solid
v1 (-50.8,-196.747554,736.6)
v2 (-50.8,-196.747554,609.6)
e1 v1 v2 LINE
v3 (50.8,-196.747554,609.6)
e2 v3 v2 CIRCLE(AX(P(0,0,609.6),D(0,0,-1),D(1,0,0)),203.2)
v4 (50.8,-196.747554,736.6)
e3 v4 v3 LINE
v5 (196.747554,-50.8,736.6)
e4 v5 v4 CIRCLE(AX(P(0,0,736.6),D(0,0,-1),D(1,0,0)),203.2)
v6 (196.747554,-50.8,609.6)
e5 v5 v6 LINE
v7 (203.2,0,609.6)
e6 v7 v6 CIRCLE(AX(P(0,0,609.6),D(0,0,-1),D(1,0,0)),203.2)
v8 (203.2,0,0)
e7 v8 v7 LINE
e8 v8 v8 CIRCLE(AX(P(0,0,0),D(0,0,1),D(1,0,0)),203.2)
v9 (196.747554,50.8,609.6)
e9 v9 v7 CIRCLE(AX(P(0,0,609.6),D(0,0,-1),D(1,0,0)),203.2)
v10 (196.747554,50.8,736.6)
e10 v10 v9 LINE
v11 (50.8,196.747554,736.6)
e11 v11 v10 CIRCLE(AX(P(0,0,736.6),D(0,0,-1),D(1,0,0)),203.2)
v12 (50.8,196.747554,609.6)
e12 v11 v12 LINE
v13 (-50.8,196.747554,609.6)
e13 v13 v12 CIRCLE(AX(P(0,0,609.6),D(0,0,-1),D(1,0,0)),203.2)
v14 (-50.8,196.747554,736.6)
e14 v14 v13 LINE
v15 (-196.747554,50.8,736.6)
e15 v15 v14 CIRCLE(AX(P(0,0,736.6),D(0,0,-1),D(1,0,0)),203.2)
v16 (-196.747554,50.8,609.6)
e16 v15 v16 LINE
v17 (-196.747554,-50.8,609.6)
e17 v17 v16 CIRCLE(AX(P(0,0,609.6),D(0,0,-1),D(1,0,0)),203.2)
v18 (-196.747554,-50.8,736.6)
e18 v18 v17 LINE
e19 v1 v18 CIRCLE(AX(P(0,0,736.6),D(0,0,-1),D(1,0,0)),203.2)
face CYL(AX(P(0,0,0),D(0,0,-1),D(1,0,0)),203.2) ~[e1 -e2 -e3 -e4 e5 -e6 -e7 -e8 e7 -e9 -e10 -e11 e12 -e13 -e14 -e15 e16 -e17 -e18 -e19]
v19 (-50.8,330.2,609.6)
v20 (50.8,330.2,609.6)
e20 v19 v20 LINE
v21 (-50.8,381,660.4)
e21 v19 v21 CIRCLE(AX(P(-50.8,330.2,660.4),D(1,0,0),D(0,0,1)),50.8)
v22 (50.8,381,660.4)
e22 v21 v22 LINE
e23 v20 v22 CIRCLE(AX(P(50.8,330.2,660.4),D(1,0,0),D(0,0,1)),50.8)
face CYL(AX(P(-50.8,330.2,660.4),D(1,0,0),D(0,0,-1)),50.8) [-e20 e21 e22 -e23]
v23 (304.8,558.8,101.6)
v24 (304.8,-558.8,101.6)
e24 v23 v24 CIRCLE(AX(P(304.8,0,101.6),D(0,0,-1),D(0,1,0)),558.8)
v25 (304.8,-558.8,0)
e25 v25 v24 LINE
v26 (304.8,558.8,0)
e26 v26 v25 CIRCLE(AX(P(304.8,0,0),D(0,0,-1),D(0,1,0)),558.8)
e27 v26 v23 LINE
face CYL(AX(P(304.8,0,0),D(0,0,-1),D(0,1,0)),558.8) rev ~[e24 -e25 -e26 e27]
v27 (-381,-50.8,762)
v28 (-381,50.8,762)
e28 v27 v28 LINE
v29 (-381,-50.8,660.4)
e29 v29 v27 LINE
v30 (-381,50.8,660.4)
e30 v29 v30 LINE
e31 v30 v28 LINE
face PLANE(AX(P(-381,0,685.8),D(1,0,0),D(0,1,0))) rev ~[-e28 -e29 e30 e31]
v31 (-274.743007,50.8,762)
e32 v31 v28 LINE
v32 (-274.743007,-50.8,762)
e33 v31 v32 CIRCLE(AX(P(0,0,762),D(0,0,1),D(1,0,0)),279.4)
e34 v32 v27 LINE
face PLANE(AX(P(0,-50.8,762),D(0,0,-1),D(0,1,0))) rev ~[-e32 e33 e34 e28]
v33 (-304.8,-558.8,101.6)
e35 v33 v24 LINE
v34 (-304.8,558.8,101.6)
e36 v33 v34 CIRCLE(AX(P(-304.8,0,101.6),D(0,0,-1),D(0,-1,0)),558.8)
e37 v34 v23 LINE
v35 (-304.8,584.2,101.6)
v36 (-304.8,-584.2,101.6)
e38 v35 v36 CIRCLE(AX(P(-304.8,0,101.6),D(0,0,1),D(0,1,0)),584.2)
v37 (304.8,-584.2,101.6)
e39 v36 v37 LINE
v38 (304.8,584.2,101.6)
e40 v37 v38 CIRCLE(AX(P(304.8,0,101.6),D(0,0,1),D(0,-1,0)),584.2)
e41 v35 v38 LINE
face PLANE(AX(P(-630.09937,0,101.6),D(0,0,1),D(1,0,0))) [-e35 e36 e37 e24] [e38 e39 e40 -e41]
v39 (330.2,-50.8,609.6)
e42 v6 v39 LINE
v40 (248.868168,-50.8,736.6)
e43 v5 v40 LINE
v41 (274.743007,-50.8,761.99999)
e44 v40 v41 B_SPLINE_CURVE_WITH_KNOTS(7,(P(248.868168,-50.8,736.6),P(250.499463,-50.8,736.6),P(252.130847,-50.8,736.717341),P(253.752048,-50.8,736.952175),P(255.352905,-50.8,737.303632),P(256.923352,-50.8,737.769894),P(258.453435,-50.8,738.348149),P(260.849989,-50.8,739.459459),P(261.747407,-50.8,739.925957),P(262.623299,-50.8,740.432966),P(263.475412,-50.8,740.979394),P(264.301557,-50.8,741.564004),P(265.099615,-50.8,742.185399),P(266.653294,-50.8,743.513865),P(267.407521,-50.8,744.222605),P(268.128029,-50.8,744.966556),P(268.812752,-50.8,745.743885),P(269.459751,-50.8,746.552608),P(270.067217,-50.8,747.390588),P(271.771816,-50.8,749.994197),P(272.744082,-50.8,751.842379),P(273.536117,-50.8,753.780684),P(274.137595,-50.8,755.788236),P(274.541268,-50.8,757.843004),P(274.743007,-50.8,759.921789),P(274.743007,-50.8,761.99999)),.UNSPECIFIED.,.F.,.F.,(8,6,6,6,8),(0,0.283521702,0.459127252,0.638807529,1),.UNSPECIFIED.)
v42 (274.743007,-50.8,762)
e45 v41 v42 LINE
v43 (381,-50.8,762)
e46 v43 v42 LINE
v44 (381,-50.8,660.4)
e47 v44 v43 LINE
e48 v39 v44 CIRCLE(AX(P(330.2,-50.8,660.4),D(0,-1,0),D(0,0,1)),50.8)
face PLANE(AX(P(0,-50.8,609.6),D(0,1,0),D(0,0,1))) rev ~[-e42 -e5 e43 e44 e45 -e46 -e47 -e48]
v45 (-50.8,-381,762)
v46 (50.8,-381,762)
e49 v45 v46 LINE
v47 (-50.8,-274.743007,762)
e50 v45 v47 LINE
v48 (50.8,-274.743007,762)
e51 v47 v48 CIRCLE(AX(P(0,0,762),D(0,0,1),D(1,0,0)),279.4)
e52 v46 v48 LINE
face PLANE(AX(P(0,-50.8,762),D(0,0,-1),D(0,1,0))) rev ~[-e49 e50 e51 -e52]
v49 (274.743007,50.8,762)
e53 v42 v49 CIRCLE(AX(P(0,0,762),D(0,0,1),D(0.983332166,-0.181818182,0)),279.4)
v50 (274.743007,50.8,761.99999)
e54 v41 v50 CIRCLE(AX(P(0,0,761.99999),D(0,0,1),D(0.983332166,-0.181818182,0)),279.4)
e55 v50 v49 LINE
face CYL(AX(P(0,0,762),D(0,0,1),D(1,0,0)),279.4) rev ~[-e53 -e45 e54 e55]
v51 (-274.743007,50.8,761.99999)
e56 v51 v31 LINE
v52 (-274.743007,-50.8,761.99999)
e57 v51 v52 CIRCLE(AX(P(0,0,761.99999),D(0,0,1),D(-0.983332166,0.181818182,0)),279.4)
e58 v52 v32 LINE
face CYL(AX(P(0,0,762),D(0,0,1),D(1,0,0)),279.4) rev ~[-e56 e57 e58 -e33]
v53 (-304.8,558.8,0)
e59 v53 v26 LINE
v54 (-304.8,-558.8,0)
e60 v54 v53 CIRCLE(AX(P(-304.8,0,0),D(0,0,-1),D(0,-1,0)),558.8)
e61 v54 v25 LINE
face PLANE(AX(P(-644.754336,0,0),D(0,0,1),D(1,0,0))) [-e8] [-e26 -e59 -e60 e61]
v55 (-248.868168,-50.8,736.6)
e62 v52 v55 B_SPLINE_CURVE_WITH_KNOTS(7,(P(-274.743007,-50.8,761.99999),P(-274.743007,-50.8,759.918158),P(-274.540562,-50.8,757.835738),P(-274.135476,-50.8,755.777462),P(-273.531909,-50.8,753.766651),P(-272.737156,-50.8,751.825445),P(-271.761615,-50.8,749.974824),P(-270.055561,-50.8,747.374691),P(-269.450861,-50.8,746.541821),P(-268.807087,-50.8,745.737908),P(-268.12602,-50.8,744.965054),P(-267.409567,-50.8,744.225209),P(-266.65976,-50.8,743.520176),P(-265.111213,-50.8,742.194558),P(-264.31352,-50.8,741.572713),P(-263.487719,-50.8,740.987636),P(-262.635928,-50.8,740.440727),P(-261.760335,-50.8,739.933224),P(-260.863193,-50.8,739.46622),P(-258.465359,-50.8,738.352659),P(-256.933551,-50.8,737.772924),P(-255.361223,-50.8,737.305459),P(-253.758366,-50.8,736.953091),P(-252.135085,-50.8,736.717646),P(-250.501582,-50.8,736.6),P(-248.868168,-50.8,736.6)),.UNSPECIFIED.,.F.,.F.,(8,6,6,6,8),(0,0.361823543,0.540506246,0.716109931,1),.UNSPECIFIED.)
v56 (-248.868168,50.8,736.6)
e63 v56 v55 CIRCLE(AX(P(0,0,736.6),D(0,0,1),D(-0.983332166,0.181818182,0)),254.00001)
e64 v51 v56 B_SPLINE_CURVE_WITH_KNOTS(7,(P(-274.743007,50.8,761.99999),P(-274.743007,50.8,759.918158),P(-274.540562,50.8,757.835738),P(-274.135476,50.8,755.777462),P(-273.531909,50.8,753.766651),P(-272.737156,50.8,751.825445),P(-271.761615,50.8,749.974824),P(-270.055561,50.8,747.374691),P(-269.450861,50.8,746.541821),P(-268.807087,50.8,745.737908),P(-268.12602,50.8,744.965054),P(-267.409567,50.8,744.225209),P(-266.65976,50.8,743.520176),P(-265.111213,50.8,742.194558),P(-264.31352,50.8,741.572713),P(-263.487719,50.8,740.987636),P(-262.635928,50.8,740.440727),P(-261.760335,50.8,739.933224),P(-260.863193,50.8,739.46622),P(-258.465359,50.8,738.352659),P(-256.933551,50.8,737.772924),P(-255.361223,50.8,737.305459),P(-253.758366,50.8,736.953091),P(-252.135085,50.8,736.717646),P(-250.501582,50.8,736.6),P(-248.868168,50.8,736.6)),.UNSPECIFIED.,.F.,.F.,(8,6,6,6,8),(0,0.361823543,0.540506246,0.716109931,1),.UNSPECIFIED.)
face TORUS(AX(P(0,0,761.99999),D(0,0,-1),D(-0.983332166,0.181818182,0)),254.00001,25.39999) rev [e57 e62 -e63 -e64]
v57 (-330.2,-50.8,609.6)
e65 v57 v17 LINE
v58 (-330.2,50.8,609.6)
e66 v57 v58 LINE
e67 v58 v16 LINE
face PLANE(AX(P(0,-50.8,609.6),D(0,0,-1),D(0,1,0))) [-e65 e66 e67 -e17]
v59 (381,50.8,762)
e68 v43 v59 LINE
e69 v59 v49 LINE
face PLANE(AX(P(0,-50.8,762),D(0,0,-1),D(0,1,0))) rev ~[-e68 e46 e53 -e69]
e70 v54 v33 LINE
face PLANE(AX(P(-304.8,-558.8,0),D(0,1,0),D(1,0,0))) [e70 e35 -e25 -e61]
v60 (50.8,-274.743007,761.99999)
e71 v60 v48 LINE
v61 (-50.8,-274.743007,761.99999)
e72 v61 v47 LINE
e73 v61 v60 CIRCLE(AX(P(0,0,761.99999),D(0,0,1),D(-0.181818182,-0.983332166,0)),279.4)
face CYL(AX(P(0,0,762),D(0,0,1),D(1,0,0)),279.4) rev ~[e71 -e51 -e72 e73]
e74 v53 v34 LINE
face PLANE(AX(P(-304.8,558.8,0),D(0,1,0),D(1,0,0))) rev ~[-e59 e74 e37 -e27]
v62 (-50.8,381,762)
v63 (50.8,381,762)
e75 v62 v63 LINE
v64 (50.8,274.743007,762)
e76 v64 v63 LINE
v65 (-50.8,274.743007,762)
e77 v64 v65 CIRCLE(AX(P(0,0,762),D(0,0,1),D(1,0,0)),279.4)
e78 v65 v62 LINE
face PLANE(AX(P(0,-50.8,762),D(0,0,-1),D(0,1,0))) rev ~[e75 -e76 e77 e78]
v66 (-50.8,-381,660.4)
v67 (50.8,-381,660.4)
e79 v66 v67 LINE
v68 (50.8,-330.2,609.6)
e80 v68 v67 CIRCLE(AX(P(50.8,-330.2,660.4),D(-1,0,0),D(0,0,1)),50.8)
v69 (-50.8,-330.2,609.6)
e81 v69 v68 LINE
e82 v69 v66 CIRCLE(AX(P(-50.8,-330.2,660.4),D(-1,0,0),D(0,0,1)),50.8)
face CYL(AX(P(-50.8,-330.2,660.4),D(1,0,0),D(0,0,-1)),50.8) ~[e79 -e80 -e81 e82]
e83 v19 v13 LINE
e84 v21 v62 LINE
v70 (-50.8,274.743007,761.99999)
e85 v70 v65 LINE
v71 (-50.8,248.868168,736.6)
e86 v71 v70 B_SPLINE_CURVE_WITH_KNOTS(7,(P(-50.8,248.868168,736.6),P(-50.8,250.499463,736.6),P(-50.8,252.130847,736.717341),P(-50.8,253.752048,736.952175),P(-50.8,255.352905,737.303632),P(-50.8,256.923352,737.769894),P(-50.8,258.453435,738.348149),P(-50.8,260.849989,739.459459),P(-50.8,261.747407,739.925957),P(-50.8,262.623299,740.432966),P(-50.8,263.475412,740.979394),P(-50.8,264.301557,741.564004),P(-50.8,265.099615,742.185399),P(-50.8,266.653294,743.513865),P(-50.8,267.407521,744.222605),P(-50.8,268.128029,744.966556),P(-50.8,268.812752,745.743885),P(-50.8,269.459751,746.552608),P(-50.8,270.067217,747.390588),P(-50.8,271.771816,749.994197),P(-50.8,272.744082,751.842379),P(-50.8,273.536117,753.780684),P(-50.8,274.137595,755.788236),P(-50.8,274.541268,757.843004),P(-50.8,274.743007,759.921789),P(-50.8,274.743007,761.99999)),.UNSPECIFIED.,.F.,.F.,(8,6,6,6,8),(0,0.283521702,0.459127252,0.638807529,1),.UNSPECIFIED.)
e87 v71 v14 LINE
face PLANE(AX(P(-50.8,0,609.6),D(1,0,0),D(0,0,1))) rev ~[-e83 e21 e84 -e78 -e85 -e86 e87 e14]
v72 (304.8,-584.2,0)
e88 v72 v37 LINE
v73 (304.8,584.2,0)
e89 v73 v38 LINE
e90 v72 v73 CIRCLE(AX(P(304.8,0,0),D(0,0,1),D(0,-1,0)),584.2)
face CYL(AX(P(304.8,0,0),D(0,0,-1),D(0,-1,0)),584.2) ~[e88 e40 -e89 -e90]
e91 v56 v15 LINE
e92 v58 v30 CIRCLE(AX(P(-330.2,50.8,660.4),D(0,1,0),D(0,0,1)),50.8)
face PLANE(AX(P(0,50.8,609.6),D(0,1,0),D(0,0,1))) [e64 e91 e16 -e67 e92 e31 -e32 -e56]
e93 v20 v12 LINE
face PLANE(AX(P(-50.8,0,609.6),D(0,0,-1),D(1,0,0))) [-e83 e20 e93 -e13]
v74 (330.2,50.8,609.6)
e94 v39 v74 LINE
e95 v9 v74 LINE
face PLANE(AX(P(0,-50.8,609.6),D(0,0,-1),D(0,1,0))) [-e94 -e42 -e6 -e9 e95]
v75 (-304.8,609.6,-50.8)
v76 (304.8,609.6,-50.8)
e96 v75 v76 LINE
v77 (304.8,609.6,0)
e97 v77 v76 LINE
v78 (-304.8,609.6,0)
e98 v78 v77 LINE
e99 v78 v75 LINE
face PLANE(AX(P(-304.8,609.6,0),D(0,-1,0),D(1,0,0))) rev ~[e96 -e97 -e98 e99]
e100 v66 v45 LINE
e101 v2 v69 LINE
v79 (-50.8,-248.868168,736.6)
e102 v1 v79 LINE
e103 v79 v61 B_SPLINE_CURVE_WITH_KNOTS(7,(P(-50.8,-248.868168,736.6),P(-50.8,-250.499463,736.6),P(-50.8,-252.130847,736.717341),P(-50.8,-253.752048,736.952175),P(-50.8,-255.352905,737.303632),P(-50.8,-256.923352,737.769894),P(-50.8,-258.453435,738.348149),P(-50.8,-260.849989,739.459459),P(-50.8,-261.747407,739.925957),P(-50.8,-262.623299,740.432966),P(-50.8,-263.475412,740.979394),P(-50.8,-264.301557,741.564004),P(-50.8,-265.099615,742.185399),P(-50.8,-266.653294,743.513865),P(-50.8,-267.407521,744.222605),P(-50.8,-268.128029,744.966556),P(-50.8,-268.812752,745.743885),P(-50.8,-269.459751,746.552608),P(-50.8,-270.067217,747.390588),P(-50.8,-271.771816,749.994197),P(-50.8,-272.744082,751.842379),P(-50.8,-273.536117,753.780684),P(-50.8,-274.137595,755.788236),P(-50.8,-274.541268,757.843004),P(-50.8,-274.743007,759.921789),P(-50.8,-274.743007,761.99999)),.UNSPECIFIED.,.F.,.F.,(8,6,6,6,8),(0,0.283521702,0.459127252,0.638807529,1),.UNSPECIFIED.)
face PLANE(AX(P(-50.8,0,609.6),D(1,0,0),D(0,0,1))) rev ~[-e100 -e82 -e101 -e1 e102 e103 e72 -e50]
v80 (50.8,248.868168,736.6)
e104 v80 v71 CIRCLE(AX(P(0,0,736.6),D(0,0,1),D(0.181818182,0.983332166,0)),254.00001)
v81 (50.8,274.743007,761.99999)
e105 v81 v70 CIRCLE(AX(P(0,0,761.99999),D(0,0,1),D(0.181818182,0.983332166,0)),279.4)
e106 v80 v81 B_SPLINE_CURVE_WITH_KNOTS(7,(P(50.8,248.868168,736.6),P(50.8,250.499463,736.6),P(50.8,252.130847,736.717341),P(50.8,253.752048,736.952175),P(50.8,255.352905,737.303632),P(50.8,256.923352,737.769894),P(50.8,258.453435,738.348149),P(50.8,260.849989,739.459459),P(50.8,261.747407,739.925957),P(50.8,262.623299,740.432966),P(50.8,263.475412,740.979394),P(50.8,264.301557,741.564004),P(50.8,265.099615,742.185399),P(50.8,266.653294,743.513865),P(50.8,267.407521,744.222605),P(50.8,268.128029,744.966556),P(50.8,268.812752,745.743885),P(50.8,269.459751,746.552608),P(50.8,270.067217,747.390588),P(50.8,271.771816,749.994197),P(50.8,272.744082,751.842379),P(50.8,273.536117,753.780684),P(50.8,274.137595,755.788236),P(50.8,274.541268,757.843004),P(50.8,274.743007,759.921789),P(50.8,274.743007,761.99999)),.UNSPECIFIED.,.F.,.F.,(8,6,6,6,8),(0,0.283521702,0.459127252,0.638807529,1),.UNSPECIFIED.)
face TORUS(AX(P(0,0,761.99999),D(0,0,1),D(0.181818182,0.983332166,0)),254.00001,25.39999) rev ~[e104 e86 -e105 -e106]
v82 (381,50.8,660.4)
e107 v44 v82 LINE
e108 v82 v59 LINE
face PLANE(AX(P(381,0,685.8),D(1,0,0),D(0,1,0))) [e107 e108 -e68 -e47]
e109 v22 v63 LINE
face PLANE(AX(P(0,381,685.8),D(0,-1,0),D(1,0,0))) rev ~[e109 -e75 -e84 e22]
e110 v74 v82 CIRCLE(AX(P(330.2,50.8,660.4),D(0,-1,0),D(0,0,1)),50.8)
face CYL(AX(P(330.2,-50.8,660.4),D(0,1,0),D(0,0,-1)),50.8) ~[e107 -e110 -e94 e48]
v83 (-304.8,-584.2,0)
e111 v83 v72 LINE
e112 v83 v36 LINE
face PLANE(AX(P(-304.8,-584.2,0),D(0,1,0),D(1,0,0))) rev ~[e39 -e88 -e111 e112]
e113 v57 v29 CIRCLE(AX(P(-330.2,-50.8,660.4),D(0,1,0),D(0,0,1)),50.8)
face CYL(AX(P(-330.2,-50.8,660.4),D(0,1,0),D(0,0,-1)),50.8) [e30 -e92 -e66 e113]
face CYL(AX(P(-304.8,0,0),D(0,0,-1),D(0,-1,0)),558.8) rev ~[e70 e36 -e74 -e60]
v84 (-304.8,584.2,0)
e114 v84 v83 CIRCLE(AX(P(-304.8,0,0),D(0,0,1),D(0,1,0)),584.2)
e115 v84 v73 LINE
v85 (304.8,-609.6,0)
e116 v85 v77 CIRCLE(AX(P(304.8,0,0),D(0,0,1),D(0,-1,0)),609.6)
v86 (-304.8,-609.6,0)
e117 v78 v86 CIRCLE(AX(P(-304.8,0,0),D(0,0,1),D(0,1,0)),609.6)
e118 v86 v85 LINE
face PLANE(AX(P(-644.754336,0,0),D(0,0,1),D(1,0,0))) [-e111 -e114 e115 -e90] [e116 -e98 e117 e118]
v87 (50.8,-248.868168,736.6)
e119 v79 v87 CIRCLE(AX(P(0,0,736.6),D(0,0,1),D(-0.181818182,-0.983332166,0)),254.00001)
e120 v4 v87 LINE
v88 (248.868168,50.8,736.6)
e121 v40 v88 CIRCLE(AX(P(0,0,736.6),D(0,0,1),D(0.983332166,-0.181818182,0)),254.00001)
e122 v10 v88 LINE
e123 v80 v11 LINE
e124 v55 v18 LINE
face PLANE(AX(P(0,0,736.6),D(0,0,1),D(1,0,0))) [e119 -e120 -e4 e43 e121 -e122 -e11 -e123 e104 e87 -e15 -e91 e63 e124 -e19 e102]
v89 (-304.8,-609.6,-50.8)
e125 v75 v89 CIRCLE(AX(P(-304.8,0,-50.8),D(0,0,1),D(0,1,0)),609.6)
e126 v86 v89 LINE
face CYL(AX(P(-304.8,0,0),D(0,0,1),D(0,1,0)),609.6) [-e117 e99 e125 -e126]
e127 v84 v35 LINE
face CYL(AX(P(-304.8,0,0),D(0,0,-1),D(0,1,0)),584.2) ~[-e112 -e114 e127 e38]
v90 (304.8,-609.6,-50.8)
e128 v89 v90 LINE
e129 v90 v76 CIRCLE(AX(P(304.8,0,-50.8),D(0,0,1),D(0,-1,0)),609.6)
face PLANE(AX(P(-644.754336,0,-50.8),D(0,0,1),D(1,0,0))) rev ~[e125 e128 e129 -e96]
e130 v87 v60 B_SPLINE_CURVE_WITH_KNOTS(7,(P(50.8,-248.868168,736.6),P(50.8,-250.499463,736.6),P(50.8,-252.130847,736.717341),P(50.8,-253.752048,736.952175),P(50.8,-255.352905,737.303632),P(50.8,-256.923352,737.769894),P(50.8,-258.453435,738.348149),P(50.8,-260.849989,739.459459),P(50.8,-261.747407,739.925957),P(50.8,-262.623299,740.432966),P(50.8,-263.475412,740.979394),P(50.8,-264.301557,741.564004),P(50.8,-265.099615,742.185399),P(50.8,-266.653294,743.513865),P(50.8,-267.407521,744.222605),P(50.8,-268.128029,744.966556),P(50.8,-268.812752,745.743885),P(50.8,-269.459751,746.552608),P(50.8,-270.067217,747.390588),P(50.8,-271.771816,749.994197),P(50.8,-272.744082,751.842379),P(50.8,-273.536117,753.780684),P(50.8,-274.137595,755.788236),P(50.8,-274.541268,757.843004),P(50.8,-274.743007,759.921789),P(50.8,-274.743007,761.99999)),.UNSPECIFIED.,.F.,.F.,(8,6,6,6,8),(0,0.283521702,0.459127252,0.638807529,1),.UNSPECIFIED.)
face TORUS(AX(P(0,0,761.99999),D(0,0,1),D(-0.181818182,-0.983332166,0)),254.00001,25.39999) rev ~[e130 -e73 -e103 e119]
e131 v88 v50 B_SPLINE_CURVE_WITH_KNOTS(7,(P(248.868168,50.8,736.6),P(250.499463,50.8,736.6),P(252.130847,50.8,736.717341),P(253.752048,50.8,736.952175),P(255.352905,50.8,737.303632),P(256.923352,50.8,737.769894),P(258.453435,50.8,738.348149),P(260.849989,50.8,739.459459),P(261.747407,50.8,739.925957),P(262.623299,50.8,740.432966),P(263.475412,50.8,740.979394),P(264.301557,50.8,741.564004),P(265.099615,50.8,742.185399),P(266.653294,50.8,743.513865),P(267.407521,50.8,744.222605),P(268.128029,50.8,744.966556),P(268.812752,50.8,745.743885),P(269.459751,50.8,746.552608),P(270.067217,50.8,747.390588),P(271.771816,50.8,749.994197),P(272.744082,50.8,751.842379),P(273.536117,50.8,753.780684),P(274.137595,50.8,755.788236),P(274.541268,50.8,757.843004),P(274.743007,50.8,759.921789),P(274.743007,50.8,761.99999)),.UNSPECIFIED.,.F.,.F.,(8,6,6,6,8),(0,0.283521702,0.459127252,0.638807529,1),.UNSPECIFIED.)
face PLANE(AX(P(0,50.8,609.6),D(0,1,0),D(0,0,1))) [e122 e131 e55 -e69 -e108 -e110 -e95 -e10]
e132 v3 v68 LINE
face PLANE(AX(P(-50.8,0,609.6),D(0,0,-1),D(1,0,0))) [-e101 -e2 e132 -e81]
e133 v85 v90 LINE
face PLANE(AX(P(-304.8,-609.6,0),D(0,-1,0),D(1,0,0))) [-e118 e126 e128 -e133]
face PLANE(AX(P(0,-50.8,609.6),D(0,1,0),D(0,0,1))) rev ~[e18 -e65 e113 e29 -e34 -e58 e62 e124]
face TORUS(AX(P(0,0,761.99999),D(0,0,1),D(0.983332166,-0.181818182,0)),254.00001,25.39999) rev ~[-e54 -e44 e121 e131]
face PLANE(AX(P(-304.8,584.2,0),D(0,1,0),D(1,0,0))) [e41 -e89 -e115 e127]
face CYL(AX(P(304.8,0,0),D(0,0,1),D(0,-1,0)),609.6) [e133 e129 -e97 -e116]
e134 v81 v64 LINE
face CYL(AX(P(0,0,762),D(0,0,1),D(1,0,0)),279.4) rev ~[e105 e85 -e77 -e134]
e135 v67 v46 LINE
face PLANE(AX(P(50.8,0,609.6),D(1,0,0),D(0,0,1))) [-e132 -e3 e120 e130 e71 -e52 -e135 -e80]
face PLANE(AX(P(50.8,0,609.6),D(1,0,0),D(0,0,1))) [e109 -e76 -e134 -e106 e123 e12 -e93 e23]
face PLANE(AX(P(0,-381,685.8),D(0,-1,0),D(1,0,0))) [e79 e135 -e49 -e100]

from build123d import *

# Parameters (mm, degrees)
F0_W      = 609.6
F0_H      = 25.4
F0_H_2    = 1117.6
F0_R      = 203.2
F1_DEPTH  = 50.8
F2_DEPTH  = 101.6
F3_DEPTH  = 762
F4_W      = 101.6
F4_H      = 152.4
F5_DEPTH  = 381
F6_W      = 101.6
F6_H      = 152.4
F7_DEPTH  = 381
F8_R      = 50.8
F9_R      = 279.4
F10_DEPTH = 25.4
F11_R     = 25.39999


# Not quite as in the source:
# - a fillet or chamfer is up to 0.001 mm smaller than in the source, because OpenCascade refuses the exact size


with BuildPart() as f1:
    # F0 (on Top) → F1 (new body)
    with BuildSketch(Plane.XY):
        with BuildLine():
            Line((-304.8, 584.2), (-304.8, 609.6))
            ThreePointArc((-304.8, 609.6), (-914.4, 0), (-304.8, -609.6))
            Line((-304.8, -609.6), (-304.8, -584.2))
            ThreePointArc((-304.8, -584.2), (-889, 0), (-304.8, 584.2))
        make_face()
        with BuildLine():
            Line((-304.8, 558.8), (-304.8, 584.2))
            ThreePointArc((-304.8, 584.2), (-889, 0), (-304.8, -584.2))
            Line((-304.8, -584.2), (-304.8, -558.8))
            ThreePointArc((-304.8, -558.8), (-863.6, 0), (-304.8, 558.8))
        make_face()
        with Locations((0, 596.9)):
            Rectangle(F0_W, F0_H)
        with BuildLine():
            ThreePointArc((304.8, -609.6), (914.4, 0), (304.8, 609.6))
            Line((304.8, 609.6), (304.8, 584.2))
            ThreePointArc((304.8, 584.2), (889, 0), (304.8, -584.2))
            Line((304.8, -584.2), (304.8, -609.6))
        make_face()
        with BuildLine():
            ThreePointArc((304.8, -584.2), (889, 0), (304.8, 584.2))
            Line((304.8, 584.2), (304.8, 558.8))
            ThreePointArc((304.8, 558.8), (863.6, 0), (304.8, -558.8))
            Line((304.8, -558.8), (304.8, -584.2))
        make_face()
        with Locations((0, -596.9)):
            Rectangle(F0_W, F0_H)
        with Locations((0, -571.5)):
            Rectangle(F0_W, F0_H)
        Rectangle(F0_W, F0_H_2)
        Circle(F0_R, mode=Mode.SUBTRACT)
        with BuildLine():
            ThreePointArc((304.8, -558.8), (863.6, 0), (304.8, 558.8))
            Line((304.8, 558.8), (304.8, -558.8))
        make_face()
        with BuildLine():
            Line((-304.8, -558.8), (-304.8, 558.8))
            ThreePointArc((-304.8, 558.8), (-863.6, 0), (-304.8, -558.8))
        make_face()
        with Locations((0, 571.5)):
            Rectangle(F0_W, F0_H)
        Circle(F0_R)
    extrude(amount=-F1_DEPTH)

    # F0 (on Top) → F2 (join)
    with BuildSketch(Plane.XY):
        with BuildLine():
            Line((-304.8, 558.8), (-304.8, 584.2))
            ThreePointArc((-304.8, 584.2), (-889, 0), (-304.8, -584.2))
            Line((-304.8, -584.2), (-304.8, -558.8))
            ThreePointArc((-304.8, -558.8), (-863.6, 0), (-304.8, 558.8))
        make_face()
        with Locations((0, -571.5)):
            Rectangle(F0_W, F0_H)
        with Locations((0, 571.5)):
            Rectangle(F0_W, F0_H)
        with BuildLine():
            ThreePointArc((304.8, -584.2), (889, 0), (304.8, 584.2))
            Line((304.8, 584.2), (304.8, 558.8))
            ThreePointArc((304.8, 558.8), (863.6, 0), (304.8, -558.8))
            Line((304.8, -558.8), (304.8, -584.2))
        make_face()
    extrude(amount=F2_DEPTH)

    # F0 (on Top) → F3 (join)
    with BuildSketch(Plane.XY):
        Circle(F0_R)
    extrude(amount=F3_DEPTH)

    # F4 (on Front) → F5 (join, symmetric)
    with BuildSketch(Plane.XZ):
        with Locations((0, 685.8)):
            Rectangle(F4_W, F4_H)
    extrude(amount=F5_DEPTH, both=True)

    # F6 (on Right) → F7 (join, symmetric)
    with BuildSketch(Plane.YZ):
        with Locations((0, 685.8)):
            Rectangle(F6_W, F6_H)
    extrude(amount=F7_DEPTH, both=True)

    # F8
    f8_edges = [f1.edges().sort_by_distance(p)[0] for p in [
        (0, -381, 609.6),
        (-381, 0, 609.6),
        (0, 381, 609.6),
        (381, 0, 609.6),
    ]]
    fillet(f8_edges, radius=F8_R)

    # F9 (on face) → F10 (cut)
    with BuildSketch(Plane.XY.offset(762)):
        Circle(F9_R)
    extrude(amount=-F10_DEPTH, mode=Mode.SUBTRACT)

    # F11 (radius 25.4 in the source; OpenCascade refuses exactly that, so slightly less here)
    f11_edges = [f1.edges().sort_by_distance(p)[0] for p in [
        (279.4, 0, 736.6),
        (-279.4, 0, 736.6),
        (0, 279.4, 736.6),
        (0, -279.4, 736.6),
    ]]
    fillet(f11_edges, radius=F11_R)


solid = f1.part
